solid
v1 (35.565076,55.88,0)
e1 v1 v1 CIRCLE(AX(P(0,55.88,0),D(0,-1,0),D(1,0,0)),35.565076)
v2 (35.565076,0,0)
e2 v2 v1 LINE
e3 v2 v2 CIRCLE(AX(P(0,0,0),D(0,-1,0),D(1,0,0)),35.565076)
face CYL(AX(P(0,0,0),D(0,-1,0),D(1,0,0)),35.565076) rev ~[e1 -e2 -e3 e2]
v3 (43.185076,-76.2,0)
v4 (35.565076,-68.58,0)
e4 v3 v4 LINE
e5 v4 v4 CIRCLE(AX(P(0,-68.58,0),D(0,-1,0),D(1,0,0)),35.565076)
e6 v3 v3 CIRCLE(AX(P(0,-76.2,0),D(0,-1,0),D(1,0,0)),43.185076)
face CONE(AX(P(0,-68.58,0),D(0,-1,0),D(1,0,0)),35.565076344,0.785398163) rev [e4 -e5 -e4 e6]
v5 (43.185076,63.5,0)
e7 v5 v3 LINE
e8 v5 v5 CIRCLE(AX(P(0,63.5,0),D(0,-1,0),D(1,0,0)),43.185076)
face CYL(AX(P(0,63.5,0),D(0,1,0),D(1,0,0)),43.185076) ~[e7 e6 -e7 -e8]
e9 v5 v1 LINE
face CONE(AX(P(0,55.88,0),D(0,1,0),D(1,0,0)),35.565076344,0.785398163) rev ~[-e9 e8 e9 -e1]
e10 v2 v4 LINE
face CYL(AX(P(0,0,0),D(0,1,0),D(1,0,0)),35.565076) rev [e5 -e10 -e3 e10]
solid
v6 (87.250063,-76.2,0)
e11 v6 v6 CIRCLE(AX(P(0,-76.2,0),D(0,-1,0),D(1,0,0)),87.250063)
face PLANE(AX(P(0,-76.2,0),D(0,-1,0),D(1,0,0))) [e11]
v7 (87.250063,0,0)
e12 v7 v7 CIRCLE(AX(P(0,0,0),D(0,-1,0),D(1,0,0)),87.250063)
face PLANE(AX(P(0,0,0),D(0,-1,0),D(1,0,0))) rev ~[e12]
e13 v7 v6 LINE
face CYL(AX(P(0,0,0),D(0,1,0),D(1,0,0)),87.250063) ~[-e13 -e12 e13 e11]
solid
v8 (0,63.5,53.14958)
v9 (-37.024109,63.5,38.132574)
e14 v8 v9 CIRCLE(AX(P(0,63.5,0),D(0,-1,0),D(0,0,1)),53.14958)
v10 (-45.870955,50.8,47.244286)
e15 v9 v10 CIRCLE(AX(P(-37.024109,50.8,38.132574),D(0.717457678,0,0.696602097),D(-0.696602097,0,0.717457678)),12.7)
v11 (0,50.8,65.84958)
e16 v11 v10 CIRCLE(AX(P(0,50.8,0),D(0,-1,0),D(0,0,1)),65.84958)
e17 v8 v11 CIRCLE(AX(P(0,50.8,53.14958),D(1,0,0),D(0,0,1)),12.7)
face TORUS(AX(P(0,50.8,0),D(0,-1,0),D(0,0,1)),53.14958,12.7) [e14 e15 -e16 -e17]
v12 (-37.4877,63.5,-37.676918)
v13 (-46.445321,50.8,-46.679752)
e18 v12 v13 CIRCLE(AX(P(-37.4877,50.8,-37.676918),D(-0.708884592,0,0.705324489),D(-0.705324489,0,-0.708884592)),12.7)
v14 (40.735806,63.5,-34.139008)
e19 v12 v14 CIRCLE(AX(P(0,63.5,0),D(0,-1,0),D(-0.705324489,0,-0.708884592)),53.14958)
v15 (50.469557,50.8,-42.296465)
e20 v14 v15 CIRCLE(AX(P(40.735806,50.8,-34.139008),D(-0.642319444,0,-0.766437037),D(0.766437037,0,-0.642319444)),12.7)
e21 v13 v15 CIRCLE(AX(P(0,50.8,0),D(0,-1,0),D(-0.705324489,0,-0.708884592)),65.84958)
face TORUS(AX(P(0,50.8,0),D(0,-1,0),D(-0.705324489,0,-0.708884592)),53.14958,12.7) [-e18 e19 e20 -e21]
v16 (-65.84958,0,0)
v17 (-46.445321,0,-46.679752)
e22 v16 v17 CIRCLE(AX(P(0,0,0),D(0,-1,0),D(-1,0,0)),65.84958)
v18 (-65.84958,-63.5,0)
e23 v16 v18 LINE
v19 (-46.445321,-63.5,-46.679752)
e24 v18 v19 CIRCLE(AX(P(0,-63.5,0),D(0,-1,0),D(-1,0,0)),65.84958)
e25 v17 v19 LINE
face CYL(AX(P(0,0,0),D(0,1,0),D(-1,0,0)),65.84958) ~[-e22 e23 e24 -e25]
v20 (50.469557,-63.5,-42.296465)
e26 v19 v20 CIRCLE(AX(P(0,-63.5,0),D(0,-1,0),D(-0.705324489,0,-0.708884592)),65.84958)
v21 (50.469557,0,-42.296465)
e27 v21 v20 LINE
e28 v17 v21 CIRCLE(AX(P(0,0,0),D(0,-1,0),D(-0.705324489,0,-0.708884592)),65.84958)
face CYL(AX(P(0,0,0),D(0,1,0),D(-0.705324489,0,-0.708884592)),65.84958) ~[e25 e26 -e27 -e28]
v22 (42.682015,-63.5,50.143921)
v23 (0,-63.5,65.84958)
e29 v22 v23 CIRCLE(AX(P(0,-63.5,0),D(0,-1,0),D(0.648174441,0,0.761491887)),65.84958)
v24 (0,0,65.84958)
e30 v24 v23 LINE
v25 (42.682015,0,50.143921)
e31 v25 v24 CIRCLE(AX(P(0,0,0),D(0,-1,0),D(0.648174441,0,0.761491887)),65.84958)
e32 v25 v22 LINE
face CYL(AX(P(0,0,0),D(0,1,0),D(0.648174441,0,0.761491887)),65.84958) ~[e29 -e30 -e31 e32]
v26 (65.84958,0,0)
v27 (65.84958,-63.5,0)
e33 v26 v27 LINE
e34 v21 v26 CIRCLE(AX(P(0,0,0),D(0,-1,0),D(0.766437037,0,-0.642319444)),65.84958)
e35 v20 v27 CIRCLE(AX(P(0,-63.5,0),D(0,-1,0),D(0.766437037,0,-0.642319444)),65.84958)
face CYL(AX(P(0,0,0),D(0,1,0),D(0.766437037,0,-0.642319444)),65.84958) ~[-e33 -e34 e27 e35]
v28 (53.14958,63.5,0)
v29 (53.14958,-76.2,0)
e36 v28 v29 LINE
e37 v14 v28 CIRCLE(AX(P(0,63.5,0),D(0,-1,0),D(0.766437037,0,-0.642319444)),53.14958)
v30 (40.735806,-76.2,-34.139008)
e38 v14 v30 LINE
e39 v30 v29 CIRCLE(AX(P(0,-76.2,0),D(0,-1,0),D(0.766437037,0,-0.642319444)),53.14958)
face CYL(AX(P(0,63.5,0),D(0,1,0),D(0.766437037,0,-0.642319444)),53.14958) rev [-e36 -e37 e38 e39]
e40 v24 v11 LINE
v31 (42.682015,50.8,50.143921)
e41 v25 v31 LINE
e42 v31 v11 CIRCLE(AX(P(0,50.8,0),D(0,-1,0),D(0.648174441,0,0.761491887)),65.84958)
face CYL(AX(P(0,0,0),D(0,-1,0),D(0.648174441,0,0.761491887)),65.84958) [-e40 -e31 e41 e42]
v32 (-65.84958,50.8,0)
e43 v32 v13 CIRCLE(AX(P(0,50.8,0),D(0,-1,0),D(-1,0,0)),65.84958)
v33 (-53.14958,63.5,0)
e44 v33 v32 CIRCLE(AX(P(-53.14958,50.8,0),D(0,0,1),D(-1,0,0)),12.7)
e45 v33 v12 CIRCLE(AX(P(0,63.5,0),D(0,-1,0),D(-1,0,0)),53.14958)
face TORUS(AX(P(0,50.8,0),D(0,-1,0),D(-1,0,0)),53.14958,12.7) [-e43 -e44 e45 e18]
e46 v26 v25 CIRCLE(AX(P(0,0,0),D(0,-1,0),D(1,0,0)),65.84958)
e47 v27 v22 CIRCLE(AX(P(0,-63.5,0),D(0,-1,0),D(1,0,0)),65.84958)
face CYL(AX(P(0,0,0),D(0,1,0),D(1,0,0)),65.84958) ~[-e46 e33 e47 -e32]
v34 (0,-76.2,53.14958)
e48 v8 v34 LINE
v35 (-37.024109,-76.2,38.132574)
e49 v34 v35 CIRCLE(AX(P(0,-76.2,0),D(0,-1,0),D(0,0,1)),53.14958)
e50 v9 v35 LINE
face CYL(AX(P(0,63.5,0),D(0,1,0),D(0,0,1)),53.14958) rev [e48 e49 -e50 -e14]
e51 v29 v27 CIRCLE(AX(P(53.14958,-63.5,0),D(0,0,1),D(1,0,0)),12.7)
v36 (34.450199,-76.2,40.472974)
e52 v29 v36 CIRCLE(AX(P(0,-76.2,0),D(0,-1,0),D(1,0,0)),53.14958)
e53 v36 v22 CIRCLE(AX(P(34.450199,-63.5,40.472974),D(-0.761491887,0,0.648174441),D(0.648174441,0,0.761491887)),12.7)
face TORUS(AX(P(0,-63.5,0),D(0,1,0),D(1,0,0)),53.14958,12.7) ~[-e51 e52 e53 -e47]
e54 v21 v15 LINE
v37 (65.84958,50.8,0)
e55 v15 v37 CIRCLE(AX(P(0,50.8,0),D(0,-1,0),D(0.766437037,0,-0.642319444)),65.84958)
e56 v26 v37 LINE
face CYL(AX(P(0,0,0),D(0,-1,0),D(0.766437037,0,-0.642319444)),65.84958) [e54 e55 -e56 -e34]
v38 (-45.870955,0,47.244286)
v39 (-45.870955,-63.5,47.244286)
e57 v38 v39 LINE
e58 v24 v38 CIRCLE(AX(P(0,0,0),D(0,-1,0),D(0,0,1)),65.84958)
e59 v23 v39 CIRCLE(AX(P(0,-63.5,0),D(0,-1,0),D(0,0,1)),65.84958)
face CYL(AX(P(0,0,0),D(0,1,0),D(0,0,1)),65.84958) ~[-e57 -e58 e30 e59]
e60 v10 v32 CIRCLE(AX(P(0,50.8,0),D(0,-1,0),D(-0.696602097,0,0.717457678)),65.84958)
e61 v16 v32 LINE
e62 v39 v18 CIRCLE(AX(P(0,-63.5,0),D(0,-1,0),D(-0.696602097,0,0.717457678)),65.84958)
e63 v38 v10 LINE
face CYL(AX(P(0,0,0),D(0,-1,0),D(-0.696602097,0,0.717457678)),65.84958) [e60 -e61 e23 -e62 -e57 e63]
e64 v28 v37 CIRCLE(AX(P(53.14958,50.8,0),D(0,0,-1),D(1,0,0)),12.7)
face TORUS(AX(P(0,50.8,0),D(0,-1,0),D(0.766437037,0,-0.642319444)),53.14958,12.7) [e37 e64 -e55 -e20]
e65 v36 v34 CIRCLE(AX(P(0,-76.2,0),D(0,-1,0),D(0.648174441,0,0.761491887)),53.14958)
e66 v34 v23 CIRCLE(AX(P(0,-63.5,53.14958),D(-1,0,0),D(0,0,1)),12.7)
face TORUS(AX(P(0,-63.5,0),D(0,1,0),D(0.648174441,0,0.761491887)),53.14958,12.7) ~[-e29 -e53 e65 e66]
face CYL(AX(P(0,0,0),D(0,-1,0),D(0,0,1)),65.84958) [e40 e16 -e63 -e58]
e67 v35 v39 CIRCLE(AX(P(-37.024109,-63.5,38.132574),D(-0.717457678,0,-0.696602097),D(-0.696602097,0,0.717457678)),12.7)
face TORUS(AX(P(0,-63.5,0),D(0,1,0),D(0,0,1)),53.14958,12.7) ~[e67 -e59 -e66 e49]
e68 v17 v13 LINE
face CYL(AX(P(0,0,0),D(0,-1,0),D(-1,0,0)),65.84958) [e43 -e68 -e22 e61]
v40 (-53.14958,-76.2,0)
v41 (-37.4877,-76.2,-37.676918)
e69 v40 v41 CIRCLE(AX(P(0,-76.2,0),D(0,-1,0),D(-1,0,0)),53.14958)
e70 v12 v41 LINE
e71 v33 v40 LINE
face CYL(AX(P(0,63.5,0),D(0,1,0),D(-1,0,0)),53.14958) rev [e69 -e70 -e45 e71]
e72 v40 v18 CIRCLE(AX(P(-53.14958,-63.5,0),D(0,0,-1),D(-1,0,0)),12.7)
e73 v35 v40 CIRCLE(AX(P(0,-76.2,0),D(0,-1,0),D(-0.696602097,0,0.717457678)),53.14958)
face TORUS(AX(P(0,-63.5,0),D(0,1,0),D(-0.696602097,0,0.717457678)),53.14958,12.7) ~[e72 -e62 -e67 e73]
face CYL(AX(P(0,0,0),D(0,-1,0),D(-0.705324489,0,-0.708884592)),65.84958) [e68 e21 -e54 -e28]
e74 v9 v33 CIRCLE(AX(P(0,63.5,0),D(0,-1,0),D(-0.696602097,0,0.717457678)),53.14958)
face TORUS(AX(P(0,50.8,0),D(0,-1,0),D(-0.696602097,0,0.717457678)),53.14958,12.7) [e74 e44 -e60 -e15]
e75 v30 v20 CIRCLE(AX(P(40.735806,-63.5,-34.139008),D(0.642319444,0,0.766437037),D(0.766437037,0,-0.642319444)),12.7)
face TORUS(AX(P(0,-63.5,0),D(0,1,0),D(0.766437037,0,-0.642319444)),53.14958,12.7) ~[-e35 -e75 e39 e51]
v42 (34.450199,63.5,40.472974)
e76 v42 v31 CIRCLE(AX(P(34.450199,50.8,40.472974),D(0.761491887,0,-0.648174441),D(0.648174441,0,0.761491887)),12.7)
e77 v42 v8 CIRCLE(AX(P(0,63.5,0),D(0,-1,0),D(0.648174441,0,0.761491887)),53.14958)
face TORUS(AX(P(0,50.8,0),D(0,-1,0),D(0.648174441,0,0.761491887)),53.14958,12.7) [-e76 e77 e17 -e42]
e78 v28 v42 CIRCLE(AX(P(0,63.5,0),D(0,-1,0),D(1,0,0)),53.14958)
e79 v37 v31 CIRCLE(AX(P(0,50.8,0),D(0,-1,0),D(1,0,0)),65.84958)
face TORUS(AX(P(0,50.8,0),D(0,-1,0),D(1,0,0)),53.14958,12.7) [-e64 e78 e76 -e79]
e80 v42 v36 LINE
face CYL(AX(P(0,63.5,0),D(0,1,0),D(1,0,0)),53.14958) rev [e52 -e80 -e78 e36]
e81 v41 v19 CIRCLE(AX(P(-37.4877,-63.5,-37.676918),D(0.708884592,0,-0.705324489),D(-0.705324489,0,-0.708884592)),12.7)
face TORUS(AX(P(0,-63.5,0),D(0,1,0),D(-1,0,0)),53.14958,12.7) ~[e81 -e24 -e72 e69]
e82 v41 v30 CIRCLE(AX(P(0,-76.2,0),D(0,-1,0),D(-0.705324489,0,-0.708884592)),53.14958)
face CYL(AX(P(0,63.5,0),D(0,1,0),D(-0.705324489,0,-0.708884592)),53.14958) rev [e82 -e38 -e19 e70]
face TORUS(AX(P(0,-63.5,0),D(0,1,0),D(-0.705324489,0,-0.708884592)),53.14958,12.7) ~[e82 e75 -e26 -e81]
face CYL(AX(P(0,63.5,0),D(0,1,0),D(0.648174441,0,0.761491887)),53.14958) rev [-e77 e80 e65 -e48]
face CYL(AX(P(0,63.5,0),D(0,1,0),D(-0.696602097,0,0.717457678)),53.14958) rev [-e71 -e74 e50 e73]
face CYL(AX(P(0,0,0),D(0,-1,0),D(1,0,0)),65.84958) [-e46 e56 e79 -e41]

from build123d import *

# Parameters (mm, degrees)
F0_R          = 35.5650763439
F1_DEPTH      = 76.2
F1_DEPTH_BACK = 63.5
F2_R          = 12.7
F3_SIZE       = 7.62
F4_DEPTH      = 177.8
F5_R          = 87.2500629337
F6_DEPTH      = 152.4
F7_DEPTH      = 76.2


# Not quite as in the source:
# - the program builds the solid bodies; features that only make, move or delete a surface that nothing else refers to are left out


with BuildPart() as f1:
    # F0 (on Front) → F1 (new body, two sides)
    with BuildSketch(Plane.XZ) as f1_sk:
        with BuildLine():
            Line((-39.0193847966, 40.3927160345), (-45.8709552438, 47.2442864817))
            ThreePointArc((-45.8709552438, 47.2442864817), (-60.649609484, 25.6474562011), (-65.8495796505, 0))
            Line((-65.8495796505, 0), (-56.161231277, 0))
            ThreePointArc((-56.161231277, 0), (-51.6984554527, 21.9397721581), (-39.0193847966, 40.3927160345))
        make_face()
        with BuildLine():
            Line((0, 56.161231277), (0, 65.8495796505))
            ThreePointArc((0, 65.8495796505), (-24.7502599425, 61.0212403424), (-45.8709552438, 47.2442864817))
            Line((-45.8709552438, 47.2442864817), (-39.0193847966, 40.3927160345))
            ThreePointArc((-39.0193847966, 40.3927160345), (-21.0425667568, 52.0700900982), (0, 56.161231277))
        make_face()
        with BuildLine():
            Line((35.8053838633, 43.2672900116), (42.6820145021, 50.1439206504))
            ThreePointArc((42.6820145021, 50.1439206504), (22.7399543018, 61.7985567671), (0, 65.8495796505))
            Line((0, 65.8495796505), (0, 56.161231277))
            ThreePointArc((0, 56.161231277), (19.0281320349, 52.8395125811), (35.8053838633, 43.2672900116))
        make_face()
        with BuildLine():
            Line((56.161231277, 0), (65.8495796505, 0))
            ThreePointArc((65.8495796505, 0), (59.7777544482, 27.6186026669), (42.6820145021, 50.1439206504))
            Line((42.6820145021, 50.1439206504), (35.8053838633, 43.2672900116))
            ThreePointArc((35.8053838633, 43.2672900116), (50.8180988559, 23.9082564655), (56.161231277, 0))
        make_face()
        with BuildLine():
            ThreePointArc((50.469556702, -42.2964654133), (61.8852415125, -22.5029780938), (65.8495796505, 0))
            Line((65.8495796505, 0), (56.161231277, 0))
            ThreePointArc((56.161231277, 0), (52.9245852031, -18.7902149969), (43.5877113736, -35.4146200849))
            Line((43.5877113736, -35.4146200849), (50.469556702, -42.2964654133))
        make_face()
        with BuildLine():
            ThreePointArc((0, -65.8495796505), (27.8474655219, -59.6714823358), (50.469556702, -42.2964654133))
            Line((50.469556702, -42.2964654133), (43.5877113736, -35.4146200849))
            ThreePointArc((43.5877113736, -35.4146200849), (24.1366446443, -50.7100215328), (0, -56.161231277))
            Line((0, -56.161231277), (0, -65.8495796505))
        make_face()
        with BuildLine():
            ThreePointArc((-46.445321126, -46.6797524163), (-25.1229483276, -60.8687490218), (0, -65.8495796505))
            Line((0, -65.8495796505), (0, -56.161231277))
            ThreePointArc((0, -56.161231277), (-21.4153744517, -51.9178739514), (-39.5945988408, -39.8290301311))
            Line((-39.5945988408, -39.8290301311), (-46.445321126, -46.6797524163))
        make_face()
        with BuildLine():
            ThreePointArc((-65.8495796505, 0), (-60.8053123215, -25.2760980698), (-46.445321126, -46.6797524163))
            Line((-46.445321126, -46.6797524163), (-39.5945988408, -39.8290301311))
            ThreePointArc((-39.5945988408, -39.8290301311), (-51.8544372323, -21.5685242394), (-56.161231277, 0))
            Line((-56.161231277, 0), (-65.8495796505, 0))
        make_face()
        with BuildLine():
            ThreePointArc((43.5877113736, -35.4146200849), (52.9245852031, -18.7902149969), (56.161231277, 0))
            ThreePointArc((56.161231277, 0), (50.8180988559, 23.9082564655), (35.8053838633, 43.2672900116))
            ThreePointArc((35.8053838633, 43.2672900116), (19.0281320349, 52.8395125811), (0, 56.161231277))
            ThreePointArc((0, 56.161231277), (-21.0425667568, 52.0700900982), (-39.0193847966, 40.3927160345))
            ThreePointArc((-39.0193847966, 40.3927160345), (-51.6984554527, 21.9397721581), (-56.161231277, 0))
            ThreePointArc((-56.161231277, 0), (-51.8544372323, -21.5685242394), (-39.5945988408, -39.8290301311))
            ThreePointArc((-39.5945988408, -39.8290301311), (-21.4153744517, -51.9178739514), (0, -56.161231277))
            ThreePointArc((0, -56.161231277), (24.1366446443, -50.7100215328), (43.5877113736, -35.4146200849))
        make_face()
        Circle(F0_R, mode=Mode.SUBTRACT)
    extrude(amount=F1_DEPTH)
    extrude(f1_sk.sketch, amount=-F1_DEPTH_BACK)

    # F2
    f2_edges = [f1.edges().sort_by_distance(p)[0] for p in [
        (65.84958, -76.2, 0),
        (65.84958, 63.5, 0),
    ]]
    fillet(f2_edges, radius=F2_R)

    # F3
    f3_edges = [f1.edges().sort_by_distance(p)[0] for p in [
        (-35.565076, -76.2, 0),
        (-35.565076, 63.5, 0),
    ]]
    chamfer(f3_edges, length=F3_SIZE)

    # F4 (cut): a face of the model
    f4_faces = [f1.faces().sort_by_distance(p)[0] for p in [
        (-44.6883734714, 63.5, 0),
    ]]
    extrude(f4_faces, amount=-F4_DEPTH, mode=Mode.SUBTRACT)


with BuildPart() as f6:
    # F5 (on Front) → F6 (new body)
    with BuildSketch(Plane.XZ):
        Circle(F5_R)
    extrude(amount=F6_DEPTH)

    # F7 (cut): a face of the model
    f7_faces = [f6.faces().sort_by_distance(p)[0] for p in [
        (0, -152.4, 0),
    ]]
    extrude(f7_faces, amount=-F7_DEPTH, mode=Mode.SUBTRACT)


solid = Compound([f1.part, f6.part])
